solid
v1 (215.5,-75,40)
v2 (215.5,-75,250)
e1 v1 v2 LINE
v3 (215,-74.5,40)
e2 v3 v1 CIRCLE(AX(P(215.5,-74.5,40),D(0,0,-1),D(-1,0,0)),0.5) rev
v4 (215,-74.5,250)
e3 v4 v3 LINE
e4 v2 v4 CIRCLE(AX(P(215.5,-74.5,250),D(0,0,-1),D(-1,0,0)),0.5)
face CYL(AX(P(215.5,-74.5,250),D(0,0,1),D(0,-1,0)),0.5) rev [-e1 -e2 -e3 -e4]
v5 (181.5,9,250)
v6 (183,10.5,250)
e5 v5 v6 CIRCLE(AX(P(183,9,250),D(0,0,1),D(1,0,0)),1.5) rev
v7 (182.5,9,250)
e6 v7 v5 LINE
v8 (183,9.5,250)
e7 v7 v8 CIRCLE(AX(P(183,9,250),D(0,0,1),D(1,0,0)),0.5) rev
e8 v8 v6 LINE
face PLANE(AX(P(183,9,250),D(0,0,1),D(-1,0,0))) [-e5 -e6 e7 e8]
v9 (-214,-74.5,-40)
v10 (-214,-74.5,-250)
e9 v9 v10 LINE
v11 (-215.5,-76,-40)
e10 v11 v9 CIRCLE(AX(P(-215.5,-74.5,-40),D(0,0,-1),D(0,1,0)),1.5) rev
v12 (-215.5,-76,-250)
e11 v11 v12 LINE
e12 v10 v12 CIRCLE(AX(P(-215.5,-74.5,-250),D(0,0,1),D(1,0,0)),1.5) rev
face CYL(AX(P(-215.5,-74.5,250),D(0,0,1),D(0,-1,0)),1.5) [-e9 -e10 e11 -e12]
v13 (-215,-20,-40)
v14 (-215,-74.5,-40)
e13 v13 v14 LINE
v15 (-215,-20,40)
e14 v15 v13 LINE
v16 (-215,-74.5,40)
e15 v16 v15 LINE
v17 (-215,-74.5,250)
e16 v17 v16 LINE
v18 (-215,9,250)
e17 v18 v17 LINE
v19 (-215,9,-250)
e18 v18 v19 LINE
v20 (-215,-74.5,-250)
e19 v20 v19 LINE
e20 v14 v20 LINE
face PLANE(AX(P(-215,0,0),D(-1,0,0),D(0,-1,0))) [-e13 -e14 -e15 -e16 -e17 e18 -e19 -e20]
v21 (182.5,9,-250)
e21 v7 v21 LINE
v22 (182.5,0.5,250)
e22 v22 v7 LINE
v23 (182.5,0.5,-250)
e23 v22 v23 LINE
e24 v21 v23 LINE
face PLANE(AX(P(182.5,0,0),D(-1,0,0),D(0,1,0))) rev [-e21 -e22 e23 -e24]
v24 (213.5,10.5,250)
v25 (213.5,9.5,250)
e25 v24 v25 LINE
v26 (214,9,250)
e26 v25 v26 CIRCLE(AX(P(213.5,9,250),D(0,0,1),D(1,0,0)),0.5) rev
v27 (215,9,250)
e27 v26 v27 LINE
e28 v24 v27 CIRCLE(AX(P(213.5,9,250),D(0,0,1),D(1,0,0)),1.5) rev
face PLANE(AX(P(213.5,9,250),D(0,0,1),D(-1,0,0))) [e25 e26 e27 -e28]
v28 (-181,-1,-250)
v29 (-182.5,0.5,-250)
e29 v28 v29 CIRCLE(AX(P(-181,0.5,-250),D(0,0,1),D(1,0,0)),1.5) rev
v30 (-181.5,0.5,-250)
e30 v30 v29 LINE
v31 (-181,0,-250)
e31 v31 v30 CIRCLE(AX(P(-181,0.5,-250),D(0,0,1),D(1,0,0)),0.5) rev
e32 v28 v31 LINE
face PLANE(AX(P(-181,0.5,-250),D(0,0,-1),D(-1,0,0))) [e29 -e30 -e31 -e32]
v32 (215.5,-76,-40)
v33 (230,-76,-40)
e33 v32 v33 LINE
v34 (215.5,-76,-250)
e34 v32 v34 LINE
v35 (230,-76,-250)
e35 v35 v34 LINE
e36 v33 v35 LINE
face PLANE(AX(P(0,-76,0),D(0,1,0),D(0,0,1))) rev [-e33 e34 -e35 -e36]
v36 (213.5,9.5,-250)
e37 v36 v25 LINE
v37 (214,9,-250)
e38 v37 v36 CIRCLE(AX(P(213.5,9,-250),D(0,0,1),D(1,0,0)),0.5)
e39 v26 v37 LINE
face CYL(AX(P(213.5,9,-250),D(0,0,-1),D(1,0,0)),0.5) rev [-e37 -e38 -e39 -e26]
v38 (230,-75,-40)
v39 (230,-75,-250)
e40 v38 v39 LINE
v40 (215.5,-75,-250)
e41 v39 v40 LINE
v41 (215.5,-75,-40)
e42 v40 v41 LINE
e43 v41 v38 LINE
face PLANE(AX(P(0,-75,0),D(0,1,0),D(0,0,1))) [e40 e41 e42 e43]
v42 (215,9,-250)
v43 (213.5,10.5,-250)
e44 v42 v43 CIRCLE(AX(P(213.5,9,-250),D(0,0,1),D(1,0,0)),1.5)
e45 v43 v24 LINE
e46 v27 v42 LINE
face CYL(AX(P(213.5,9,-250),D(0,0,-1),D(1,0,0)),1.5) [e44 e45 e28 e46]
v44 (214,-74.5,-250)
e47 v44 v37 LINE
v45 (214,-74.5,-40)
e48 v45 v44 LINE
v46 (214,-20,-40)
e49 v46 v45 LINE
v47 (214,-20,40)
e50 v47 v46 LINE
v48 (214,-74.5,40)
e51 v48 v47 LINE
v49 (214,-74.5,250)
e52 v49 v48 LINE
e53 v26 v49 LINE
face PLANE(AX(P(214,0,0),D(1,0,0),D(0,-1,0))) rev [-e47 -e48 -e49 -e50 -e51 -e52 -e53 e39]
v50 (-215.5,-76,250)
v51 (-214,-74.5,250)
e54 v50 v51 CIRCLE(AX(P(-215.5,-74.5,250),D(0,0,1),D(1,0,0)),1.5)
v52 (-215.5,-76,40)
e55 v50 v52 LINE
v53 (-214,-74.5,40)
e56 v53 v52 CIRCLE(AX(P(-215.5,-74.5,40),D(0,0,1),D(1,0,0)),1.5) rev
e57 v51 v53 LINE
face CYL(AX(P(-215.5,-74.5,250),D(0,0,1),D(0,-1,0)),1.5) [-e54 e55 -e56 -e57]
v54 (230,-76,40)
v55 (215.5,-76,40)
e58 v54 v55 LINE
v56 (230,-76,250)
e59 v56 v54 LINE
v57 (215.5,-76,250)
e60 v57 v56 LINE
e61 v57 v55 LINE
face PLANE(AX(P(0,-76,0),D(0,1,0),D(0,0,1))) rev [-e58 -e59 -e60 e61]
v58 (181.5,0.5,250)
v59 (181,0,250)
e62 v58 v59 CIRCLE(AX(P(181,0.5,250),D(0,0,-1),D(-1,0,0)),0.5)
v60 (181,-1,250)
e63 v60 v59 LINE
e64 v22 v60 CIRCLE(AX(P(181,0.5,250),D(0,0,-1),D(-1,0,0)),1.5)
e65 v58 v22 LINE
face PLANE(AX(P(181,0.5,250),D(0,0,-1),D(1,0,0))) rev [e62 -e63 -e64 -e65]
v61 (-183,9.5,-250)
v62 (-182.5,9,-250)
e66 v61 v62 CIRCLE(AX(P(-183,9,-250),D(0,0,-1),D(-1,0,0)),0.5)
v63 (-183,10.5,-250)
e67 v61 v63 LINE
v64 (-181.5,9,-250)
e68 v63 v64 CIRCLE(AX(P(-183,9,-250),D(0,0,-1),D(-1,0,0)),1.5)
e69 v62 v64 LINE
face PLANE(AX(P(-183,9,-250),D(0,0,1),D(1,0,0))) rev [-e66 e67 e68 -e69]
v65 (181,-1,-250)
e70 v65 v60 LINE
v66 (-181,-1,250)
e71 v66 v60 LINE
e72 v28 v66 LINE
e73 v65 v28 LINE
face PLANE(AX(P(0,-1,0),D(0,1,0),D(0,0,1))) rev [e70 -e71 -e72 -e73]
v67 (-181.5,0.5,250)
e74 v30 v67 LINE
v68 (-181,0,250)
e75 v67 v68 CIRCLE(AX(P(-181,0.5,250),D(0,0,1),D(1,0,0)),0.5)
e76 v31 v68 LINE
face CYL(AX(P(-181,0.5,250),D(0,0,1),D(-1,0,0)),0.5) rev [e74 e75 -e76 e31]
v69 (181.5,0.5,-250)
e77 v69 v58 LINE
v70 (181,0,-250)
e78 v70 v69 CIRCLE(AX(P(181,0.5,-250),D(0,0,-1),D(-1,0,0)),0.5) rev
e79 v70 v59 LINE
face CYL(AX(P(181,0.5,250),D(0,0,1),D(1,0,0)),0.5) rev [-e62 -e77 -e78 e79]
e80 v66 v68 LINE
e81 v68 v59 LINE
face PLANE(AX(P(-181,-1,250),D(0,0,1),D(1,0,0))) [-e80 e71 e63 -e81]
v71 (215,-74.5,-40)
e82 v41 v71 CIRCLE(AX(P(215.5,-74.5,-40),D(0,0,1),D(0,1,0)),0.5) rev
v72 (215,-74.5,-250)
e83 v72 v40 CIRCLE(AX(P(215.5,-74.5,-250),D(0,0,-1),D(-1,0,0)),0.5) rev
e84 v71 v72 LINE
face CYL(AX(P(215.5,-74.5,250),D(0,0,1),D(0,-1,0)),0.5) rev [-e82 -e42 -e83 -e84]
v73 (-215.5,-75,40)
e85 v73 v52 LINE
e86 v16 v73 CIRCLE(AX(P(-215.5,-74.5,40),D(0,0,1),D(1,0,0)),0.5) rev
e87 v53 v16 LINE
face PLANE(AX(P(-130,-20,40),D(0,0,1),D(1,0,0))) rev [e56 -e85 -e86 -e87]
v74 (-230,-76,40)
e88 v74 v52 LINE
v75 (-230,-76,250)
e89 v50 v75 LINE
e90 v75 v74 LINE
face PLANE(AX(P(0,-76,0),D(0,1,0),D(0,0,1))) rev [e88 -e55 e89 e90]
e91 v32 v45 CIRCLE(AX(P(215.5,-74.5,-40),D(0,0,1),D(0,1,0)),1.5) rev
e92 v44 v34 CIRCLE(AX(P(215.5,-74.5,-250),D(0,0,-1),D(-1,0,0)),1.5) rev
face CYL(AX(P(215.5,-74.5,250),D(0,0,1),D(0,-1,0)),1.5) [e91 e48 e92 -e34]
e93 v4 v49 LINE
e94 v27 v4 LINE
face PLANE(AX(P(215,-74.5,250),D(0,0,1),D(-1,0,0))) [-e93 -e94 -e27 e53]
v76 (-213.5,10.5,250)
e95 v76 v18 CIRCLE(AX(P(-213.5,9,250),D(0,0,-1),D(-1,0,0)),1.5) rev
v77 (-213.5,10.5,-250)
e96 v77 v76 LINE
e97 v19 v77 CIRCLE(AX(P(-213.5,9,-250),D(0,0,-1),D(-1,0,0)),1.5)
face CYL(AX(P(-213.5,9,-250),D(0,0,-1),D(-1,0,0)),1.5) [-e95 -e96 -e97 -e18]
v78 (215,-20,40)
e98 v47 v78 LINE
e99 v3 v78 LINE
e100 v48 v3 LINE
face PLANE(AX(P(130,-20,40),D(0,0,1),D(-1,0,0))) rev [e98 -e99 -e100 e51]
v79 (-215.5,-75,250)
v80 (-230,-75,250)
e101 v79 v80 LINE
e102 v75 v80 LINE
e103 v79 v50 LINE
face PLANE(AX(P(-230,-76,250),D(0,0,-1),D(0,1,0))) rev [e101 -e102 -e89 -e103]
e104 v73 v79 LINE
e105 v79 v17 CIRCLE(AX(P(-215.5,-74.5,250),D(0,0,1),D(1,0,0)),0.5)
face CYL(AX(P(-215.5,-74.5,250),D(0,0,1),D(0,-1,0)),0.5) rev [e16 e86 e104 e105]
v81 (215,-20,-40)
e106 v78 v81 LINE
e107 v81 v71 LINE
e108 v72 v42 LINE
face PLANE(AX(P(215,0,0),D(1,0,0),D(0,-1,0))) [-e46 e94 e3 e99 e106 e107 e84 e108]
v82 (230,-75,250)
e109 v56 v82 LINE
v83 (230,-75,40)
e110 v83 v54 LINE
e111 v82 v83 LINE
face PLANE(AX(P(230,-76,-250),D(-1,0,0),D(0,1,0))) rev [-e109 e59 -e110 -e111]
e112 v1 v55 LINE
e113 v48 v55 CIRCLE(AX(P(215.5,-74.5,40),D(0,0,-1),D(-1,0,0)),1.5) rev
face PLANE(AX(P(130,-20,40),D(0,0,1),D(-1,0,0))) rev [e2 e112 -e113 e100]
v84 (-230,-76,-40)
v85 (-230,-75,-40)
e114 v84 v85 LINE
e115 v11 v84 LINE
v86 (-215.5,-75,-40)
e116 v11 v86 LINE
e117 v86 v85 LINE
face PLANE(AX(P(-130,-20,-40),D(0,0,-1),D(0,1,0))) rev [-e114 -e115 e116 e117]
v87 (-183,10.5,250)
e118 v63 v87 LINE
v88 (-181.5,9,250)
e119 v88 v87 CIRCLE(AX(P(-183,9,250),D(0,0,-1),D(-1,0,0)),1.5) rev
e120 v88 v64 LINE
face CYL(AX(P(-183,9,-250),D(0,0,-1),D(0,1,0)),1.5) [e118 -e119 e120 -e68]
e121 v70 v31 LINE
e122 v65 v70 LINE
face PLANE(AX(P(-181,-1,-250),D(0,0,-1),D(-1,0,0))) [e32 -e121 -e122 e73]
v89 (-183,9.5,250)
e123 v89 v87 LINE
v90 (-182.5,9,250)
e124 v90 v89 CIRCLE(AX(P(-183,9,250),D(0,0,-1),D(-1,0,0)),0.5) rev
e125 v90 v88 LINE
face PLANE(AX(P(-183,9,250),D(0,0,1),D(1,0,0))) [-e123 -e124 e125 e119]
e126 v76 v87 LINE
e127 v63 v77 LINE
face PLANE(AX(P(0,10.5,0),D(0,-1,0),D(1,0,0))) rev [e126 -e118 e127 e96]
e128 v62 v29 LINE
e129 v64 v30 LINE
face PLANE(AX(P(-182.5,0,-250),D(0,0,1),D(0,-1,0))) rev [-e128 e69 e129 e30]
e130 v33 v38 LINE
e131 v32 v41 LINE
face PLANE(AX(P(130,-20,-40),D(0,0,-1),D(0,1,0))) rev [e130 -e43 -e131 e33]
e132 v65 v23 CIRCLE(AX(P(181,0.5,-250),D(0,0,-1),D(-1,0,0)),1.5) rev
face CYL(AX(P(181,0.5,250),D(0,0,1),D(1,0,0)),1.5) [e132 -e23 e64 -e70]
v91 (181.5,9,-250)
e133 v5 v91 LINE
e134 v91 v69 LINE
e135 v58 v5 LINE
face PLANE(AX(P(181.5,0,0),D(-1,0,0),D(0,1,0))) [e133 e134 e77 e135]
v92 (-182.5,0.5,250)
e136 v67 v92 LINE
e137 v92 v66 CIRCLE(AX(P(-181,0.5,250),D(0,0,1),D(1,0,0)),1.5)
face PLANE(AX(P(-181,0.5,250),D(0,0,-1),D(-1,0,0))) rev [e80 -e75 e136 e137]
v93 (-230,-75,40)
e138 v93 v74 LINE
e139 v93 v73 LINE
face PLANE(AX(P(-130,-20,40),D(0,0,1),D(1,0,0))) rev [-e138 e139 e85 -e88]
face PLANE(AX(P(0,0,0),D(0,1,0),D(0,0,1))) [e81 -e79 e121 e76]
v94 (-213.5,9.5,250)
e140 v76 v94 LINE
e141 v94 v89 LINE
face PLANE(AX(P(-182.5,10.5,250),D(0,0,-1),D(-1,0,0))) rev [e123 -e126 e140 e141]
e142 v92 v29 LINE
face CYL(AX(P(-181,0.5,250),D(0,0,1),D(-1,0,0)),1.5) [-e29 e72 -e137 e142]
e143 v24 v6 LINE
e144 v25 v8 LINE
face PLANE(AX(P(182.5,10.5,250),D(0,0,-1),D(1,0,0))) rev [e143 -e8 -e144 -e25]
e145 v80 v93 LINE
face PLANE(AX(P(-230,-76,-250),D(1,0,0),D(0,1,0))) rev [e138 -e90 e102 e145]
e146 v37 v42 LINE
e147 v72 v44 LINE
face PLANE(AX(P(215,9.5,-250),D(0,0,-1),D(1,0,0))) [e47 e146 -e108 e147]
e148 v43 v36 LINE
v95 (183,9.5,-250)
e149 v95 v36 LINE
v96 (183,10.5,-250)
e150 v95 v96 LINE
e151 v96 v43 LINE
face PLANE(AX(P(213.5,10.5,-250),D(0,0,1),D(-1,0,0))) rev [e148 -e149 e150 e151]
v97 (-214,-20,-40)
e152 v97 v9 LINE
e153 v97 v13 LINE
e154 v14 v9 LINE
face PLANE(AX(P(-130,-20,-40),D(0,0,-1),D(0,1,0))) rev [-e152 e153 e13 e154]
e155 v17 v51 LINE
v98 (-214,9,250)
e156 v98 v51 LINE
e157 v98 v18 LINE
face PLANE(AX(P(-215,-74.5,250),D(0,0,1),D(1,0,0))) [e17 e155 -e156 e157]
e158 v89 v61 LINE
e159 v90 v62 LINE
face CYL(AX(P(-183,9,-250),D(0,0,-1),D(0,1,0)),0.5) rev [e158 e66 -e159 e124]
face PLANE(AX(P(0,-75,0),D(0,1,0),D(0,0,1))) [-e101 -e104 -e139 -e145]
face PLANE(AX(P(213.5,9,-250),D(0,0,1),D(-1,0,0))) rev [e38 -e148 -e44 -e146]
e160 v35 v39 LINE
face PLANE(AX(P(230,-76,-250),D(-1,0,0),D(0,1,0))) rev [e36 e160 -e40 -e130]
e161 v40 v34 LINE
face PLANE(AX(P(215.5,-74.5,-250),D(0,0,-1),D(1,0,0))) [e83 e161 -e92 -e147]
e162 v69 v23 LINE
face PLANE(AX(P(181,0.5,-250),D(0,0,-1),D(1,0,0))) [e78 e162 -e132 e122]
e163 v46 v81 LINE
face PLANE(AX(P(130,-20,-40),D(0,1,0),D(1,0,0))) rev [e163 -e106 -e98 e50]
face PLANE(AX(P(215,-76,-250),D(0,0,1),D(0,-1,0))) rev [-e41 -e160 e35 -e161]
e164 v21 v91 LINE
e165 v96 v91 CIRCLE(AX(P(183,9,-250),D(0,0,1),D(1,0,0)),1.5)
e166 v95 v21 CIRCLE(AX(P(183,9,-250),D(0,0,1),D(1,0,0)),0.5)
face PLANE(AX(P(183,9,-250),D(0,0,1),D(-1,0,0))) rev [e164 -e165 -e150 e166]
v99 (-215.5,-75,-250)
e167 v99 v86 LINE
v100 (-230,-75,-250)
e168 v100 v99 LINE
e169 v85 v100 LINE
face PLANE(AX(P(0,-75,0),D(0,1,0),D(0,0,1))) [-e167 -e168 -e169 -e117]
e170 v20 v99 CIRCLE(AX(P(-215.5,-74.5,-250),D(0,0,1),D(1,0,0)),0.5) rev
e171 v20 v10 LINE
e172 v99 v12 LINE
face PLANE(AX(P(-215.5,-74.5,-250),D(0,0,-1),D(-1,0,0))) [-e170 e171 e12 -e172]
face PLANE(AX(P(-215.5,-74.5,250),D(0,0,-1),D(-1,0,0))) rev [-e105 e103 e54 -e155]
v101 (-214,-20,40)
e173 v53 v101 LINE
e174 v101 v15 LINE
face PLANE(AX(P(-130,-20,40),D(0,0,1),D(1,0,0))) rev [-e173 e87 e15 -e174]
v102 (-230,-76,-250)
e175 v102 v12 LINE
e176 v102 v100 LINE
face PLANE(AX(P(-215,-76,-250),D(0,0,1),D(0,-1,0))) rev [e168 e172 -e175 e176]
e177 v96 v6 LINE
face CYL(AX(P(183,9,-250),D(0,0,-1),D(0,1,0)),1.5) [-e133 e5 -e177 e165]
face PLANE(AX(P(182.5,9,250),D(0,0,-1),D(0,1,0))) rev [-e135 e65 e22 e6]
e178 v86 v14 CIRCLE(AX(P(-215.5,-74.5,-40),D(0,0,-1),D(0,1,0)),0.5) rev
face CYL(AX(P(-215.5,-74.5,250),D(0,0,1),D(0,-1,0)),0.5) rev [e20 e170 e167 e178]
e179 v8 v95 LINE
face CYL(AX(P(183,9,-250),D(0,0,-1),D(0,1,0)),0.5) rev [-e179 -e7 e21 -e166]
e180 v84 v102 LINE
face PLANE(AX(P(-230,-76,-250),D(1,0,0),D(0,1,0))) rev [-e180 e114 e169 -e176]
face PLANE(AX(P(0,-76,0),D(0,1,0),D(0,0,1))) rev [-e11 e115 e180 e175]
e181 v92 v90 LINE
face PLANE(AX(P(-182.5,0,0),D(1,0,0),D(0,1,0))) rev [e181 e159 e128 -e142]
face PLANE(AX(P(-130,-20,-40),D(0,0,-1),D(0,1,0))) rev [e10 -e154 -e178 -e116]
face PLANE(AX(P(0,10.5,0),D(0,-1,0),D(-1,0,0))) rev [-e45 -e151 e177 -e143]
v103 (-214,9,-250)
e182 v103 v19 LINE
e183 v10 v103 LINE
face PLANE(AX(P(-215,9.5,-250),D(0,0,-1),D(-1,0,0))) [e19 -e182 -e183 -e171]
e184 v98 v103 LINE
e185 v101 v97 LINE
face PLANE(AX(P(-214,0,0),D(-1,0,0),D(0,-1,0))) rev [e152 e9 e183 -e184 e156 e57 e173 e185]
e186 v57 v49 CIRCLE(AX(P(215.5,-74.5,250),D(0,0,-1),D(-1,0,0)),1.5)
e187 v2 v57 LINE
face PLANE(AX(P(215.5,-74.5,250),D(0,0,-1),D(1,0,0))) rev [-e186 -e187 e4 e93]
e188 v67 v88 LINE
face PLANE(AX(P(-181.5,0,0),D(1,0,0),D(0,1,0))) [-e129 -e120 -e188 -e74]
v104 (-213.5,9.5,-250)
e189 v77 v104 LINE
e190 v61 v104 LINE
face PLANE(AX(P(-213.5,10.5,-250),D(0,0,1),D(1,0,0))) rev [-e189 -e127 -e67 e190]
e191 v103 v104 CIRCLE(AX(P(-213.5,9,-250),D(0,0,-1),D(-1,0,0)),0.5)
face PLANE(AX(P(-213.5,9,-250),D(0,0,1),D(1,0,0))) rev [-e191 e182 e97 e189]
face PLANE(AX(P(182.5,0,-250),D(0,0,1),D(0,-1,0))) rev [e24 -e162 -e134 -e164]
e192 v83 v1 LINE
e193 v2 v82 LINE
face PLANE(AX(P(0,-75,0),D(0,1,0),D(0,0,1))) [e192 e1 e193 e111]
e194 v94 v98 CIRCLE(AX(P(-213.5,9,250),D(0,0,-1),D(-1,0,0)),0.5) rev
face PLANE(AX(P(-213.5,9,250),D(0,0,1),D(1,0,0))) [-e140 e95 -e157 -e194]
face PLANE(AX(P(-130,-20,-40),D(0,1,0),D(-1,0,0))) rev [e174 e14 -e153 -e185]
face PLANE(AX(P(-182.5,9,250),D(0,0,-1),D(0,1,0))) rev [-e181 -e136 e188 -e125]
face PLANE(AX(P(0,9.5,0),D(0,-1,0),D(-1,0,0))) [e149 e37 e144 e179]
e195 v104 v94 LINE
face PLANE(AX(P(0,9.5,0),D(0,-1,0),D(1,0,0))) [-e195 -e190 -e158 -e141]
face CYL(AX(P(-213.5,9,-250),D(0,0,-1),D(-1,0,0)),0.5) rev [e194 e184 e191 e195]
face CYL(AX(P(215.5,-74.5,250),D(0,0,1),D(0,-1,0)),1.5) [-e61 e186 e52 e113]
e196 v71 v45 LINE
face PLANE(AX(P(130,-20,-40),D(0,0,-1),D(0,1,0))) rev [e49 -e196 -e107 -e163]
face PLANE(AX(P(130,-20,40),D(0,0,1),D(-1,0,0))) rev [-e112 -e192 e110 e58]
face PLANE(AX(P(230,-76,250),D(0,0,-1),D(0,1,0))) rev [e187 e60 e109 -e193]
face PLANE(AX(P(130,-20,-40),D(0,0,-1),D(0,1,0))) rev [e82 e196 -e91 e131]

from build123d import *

# Parameters (mm, degrees)
SKETCH_1_W             = 181
SKETCH_1_H             = 500
SM_BASE_FLANGE_1_DEPTH = 1
SM_EDGE_FLANGE_1_DEPTH = 500
SM_EDGE_FLANGE_2_DEPTH = 500
SM_EDGE_FLANGE_3_DEPTH = 500
SM_EDGE_FLANGE_4_DEPTH = 500
SKETCH_18_W            = 80
SKETCH_18_H            = 71.447403799
CUT_EXTRUDE_1_DEPTH    = 100


# Sheet-metal steps are written as plain solids
with BuildPart() as part:
    # Sketch 1 → 基体-法兰1 (new body)
    with BuildSketch(Plane(origin=(0, 0, 0), x_dir=(1, 0, 0), z_dir=(0, 1, 0))):
        with Locations((-90.5, 0)):
            Rectangle(SKETCH_1_W, SKETCH_1_H)
    extrude(amount=-SM_BASE_FLANGE_1_DEPTH)

    # 边线-法兰1 section (across the edge) → 边线-法兰1 (add)
    with BuildSketch(Plane(origin=(-181.5, 0, -250), x_dir=(1, 0, 0), z_dir=(0, 0, 1))):
        with BuildLine():
            Line((-1, 0.5), (-1, 9))
            Line((-1, 9), (0, 9))
            Line((0, 9), (0, 0.5))
            ThreePointArc((0, 0.5), (0.146446609, 0.146446609), (0.5, 0))
            Line((0.5, 0), (0.5, -1))
            ThreePointArc((0.5, -1), (-0.560660172, -0.560660172), (-1, 0.5))
        make_face()
    extrude(amount=SM_EDGE_FLANGE_1_DEPTH)

    # 边线-法兰2 section (across the edge) → 边线-法兰2 (add)
    with BuildSketch(Plane(origin=(-182.5, 9.5, 250), x_dir=(0, -1, 0), z_dir=(0, 0, -1))):
        with BuildLine():
            Line((-1, 0.5), (-1, 31))
            Line((-1, 31), (0, 31))
            Line((0, 31), (0, 0.5))
            ThreePointArc((0, 0.5), (0.146446609, 0.146446609), (0.5, 0))
            Line((0.5, 0), (0.5, -1))
            ThreePointArc((0.5, -1), (-0.560660172, -0.560660172), (-1, 0.5))
        make_face()
    extrude(amount=SM_EDGE_FLANGE_2_DEPTH)

    # 边线-法兰3 section (across the edge) → 边线-法兰3 (add)
    with BuildSketch(Plane(origin=(-214, 9.5, 250), x_dir=(1, 0, 0), z_dir=(0, 0, -1))):
        with BuildLine():
            Line((-1, 0.5), (-1, 84))
            Line((-1, 84), (0, 84))
            Line((0, 84), (0, 0.5))
            ThreePointArc((0, 0.5), (0.146446609, 0.146446609), (0.5, 0))
            Line((0.5, 0), (0.5, -1))
            ThreePointArc((0.5, -1), (-0.560660172, -0.560660172), (-1, 0.5))
        make_face()
    extrude(amount=SM_EDGE_FLANGE_3_DEPTH)

    # 边线-法兰4 section (across the edge) → 边线-法兰4 (add)
    with BuildSketch(Plane(origin=(-215, -75, -250), x_dir=(0, 1, 0), z_dir=(0, 0, 1))):
        with BuildLine():
            Line((-1, 0.5), (-1, 15))
            Line((-1, 15), (0, 15))
            Line((0, 15), (0, 0.5))
            ThreePointArc((0, 0.5), (0.146446609, 0.146446609), (0.5, 0))
            Line((0.5, 0), (0.5, -1))
            ThreePointArc((0.5, -1), (-0.560660172, -0.560660172), (-1, 0.5))
        make_face()
    extrude(amount=SM_EDGE_FLANGE_4_DEPTH)

    # 草图18 → 切除-拉伸1 (cut)
    with BuildSketch(Plane.ZY.offset(230)):
        with Locations((0, -55.723701899)):
            Rectangle(SKETCH_18_W, SKETCH_18_H)
    extrude(amount=-CUT_EXTRUDE_1_DEPTH, mode=Mode.SUBTRACT)

    # 镜向1: part across plane


with BuildPart() as part_1:
    add(part.part)
    add(part.part.mirror(Plane(origin=(0, -1, -250), x_dir=(0, 0, 1), z_dir=(1, 0, 0))))


solid = part_1.part
